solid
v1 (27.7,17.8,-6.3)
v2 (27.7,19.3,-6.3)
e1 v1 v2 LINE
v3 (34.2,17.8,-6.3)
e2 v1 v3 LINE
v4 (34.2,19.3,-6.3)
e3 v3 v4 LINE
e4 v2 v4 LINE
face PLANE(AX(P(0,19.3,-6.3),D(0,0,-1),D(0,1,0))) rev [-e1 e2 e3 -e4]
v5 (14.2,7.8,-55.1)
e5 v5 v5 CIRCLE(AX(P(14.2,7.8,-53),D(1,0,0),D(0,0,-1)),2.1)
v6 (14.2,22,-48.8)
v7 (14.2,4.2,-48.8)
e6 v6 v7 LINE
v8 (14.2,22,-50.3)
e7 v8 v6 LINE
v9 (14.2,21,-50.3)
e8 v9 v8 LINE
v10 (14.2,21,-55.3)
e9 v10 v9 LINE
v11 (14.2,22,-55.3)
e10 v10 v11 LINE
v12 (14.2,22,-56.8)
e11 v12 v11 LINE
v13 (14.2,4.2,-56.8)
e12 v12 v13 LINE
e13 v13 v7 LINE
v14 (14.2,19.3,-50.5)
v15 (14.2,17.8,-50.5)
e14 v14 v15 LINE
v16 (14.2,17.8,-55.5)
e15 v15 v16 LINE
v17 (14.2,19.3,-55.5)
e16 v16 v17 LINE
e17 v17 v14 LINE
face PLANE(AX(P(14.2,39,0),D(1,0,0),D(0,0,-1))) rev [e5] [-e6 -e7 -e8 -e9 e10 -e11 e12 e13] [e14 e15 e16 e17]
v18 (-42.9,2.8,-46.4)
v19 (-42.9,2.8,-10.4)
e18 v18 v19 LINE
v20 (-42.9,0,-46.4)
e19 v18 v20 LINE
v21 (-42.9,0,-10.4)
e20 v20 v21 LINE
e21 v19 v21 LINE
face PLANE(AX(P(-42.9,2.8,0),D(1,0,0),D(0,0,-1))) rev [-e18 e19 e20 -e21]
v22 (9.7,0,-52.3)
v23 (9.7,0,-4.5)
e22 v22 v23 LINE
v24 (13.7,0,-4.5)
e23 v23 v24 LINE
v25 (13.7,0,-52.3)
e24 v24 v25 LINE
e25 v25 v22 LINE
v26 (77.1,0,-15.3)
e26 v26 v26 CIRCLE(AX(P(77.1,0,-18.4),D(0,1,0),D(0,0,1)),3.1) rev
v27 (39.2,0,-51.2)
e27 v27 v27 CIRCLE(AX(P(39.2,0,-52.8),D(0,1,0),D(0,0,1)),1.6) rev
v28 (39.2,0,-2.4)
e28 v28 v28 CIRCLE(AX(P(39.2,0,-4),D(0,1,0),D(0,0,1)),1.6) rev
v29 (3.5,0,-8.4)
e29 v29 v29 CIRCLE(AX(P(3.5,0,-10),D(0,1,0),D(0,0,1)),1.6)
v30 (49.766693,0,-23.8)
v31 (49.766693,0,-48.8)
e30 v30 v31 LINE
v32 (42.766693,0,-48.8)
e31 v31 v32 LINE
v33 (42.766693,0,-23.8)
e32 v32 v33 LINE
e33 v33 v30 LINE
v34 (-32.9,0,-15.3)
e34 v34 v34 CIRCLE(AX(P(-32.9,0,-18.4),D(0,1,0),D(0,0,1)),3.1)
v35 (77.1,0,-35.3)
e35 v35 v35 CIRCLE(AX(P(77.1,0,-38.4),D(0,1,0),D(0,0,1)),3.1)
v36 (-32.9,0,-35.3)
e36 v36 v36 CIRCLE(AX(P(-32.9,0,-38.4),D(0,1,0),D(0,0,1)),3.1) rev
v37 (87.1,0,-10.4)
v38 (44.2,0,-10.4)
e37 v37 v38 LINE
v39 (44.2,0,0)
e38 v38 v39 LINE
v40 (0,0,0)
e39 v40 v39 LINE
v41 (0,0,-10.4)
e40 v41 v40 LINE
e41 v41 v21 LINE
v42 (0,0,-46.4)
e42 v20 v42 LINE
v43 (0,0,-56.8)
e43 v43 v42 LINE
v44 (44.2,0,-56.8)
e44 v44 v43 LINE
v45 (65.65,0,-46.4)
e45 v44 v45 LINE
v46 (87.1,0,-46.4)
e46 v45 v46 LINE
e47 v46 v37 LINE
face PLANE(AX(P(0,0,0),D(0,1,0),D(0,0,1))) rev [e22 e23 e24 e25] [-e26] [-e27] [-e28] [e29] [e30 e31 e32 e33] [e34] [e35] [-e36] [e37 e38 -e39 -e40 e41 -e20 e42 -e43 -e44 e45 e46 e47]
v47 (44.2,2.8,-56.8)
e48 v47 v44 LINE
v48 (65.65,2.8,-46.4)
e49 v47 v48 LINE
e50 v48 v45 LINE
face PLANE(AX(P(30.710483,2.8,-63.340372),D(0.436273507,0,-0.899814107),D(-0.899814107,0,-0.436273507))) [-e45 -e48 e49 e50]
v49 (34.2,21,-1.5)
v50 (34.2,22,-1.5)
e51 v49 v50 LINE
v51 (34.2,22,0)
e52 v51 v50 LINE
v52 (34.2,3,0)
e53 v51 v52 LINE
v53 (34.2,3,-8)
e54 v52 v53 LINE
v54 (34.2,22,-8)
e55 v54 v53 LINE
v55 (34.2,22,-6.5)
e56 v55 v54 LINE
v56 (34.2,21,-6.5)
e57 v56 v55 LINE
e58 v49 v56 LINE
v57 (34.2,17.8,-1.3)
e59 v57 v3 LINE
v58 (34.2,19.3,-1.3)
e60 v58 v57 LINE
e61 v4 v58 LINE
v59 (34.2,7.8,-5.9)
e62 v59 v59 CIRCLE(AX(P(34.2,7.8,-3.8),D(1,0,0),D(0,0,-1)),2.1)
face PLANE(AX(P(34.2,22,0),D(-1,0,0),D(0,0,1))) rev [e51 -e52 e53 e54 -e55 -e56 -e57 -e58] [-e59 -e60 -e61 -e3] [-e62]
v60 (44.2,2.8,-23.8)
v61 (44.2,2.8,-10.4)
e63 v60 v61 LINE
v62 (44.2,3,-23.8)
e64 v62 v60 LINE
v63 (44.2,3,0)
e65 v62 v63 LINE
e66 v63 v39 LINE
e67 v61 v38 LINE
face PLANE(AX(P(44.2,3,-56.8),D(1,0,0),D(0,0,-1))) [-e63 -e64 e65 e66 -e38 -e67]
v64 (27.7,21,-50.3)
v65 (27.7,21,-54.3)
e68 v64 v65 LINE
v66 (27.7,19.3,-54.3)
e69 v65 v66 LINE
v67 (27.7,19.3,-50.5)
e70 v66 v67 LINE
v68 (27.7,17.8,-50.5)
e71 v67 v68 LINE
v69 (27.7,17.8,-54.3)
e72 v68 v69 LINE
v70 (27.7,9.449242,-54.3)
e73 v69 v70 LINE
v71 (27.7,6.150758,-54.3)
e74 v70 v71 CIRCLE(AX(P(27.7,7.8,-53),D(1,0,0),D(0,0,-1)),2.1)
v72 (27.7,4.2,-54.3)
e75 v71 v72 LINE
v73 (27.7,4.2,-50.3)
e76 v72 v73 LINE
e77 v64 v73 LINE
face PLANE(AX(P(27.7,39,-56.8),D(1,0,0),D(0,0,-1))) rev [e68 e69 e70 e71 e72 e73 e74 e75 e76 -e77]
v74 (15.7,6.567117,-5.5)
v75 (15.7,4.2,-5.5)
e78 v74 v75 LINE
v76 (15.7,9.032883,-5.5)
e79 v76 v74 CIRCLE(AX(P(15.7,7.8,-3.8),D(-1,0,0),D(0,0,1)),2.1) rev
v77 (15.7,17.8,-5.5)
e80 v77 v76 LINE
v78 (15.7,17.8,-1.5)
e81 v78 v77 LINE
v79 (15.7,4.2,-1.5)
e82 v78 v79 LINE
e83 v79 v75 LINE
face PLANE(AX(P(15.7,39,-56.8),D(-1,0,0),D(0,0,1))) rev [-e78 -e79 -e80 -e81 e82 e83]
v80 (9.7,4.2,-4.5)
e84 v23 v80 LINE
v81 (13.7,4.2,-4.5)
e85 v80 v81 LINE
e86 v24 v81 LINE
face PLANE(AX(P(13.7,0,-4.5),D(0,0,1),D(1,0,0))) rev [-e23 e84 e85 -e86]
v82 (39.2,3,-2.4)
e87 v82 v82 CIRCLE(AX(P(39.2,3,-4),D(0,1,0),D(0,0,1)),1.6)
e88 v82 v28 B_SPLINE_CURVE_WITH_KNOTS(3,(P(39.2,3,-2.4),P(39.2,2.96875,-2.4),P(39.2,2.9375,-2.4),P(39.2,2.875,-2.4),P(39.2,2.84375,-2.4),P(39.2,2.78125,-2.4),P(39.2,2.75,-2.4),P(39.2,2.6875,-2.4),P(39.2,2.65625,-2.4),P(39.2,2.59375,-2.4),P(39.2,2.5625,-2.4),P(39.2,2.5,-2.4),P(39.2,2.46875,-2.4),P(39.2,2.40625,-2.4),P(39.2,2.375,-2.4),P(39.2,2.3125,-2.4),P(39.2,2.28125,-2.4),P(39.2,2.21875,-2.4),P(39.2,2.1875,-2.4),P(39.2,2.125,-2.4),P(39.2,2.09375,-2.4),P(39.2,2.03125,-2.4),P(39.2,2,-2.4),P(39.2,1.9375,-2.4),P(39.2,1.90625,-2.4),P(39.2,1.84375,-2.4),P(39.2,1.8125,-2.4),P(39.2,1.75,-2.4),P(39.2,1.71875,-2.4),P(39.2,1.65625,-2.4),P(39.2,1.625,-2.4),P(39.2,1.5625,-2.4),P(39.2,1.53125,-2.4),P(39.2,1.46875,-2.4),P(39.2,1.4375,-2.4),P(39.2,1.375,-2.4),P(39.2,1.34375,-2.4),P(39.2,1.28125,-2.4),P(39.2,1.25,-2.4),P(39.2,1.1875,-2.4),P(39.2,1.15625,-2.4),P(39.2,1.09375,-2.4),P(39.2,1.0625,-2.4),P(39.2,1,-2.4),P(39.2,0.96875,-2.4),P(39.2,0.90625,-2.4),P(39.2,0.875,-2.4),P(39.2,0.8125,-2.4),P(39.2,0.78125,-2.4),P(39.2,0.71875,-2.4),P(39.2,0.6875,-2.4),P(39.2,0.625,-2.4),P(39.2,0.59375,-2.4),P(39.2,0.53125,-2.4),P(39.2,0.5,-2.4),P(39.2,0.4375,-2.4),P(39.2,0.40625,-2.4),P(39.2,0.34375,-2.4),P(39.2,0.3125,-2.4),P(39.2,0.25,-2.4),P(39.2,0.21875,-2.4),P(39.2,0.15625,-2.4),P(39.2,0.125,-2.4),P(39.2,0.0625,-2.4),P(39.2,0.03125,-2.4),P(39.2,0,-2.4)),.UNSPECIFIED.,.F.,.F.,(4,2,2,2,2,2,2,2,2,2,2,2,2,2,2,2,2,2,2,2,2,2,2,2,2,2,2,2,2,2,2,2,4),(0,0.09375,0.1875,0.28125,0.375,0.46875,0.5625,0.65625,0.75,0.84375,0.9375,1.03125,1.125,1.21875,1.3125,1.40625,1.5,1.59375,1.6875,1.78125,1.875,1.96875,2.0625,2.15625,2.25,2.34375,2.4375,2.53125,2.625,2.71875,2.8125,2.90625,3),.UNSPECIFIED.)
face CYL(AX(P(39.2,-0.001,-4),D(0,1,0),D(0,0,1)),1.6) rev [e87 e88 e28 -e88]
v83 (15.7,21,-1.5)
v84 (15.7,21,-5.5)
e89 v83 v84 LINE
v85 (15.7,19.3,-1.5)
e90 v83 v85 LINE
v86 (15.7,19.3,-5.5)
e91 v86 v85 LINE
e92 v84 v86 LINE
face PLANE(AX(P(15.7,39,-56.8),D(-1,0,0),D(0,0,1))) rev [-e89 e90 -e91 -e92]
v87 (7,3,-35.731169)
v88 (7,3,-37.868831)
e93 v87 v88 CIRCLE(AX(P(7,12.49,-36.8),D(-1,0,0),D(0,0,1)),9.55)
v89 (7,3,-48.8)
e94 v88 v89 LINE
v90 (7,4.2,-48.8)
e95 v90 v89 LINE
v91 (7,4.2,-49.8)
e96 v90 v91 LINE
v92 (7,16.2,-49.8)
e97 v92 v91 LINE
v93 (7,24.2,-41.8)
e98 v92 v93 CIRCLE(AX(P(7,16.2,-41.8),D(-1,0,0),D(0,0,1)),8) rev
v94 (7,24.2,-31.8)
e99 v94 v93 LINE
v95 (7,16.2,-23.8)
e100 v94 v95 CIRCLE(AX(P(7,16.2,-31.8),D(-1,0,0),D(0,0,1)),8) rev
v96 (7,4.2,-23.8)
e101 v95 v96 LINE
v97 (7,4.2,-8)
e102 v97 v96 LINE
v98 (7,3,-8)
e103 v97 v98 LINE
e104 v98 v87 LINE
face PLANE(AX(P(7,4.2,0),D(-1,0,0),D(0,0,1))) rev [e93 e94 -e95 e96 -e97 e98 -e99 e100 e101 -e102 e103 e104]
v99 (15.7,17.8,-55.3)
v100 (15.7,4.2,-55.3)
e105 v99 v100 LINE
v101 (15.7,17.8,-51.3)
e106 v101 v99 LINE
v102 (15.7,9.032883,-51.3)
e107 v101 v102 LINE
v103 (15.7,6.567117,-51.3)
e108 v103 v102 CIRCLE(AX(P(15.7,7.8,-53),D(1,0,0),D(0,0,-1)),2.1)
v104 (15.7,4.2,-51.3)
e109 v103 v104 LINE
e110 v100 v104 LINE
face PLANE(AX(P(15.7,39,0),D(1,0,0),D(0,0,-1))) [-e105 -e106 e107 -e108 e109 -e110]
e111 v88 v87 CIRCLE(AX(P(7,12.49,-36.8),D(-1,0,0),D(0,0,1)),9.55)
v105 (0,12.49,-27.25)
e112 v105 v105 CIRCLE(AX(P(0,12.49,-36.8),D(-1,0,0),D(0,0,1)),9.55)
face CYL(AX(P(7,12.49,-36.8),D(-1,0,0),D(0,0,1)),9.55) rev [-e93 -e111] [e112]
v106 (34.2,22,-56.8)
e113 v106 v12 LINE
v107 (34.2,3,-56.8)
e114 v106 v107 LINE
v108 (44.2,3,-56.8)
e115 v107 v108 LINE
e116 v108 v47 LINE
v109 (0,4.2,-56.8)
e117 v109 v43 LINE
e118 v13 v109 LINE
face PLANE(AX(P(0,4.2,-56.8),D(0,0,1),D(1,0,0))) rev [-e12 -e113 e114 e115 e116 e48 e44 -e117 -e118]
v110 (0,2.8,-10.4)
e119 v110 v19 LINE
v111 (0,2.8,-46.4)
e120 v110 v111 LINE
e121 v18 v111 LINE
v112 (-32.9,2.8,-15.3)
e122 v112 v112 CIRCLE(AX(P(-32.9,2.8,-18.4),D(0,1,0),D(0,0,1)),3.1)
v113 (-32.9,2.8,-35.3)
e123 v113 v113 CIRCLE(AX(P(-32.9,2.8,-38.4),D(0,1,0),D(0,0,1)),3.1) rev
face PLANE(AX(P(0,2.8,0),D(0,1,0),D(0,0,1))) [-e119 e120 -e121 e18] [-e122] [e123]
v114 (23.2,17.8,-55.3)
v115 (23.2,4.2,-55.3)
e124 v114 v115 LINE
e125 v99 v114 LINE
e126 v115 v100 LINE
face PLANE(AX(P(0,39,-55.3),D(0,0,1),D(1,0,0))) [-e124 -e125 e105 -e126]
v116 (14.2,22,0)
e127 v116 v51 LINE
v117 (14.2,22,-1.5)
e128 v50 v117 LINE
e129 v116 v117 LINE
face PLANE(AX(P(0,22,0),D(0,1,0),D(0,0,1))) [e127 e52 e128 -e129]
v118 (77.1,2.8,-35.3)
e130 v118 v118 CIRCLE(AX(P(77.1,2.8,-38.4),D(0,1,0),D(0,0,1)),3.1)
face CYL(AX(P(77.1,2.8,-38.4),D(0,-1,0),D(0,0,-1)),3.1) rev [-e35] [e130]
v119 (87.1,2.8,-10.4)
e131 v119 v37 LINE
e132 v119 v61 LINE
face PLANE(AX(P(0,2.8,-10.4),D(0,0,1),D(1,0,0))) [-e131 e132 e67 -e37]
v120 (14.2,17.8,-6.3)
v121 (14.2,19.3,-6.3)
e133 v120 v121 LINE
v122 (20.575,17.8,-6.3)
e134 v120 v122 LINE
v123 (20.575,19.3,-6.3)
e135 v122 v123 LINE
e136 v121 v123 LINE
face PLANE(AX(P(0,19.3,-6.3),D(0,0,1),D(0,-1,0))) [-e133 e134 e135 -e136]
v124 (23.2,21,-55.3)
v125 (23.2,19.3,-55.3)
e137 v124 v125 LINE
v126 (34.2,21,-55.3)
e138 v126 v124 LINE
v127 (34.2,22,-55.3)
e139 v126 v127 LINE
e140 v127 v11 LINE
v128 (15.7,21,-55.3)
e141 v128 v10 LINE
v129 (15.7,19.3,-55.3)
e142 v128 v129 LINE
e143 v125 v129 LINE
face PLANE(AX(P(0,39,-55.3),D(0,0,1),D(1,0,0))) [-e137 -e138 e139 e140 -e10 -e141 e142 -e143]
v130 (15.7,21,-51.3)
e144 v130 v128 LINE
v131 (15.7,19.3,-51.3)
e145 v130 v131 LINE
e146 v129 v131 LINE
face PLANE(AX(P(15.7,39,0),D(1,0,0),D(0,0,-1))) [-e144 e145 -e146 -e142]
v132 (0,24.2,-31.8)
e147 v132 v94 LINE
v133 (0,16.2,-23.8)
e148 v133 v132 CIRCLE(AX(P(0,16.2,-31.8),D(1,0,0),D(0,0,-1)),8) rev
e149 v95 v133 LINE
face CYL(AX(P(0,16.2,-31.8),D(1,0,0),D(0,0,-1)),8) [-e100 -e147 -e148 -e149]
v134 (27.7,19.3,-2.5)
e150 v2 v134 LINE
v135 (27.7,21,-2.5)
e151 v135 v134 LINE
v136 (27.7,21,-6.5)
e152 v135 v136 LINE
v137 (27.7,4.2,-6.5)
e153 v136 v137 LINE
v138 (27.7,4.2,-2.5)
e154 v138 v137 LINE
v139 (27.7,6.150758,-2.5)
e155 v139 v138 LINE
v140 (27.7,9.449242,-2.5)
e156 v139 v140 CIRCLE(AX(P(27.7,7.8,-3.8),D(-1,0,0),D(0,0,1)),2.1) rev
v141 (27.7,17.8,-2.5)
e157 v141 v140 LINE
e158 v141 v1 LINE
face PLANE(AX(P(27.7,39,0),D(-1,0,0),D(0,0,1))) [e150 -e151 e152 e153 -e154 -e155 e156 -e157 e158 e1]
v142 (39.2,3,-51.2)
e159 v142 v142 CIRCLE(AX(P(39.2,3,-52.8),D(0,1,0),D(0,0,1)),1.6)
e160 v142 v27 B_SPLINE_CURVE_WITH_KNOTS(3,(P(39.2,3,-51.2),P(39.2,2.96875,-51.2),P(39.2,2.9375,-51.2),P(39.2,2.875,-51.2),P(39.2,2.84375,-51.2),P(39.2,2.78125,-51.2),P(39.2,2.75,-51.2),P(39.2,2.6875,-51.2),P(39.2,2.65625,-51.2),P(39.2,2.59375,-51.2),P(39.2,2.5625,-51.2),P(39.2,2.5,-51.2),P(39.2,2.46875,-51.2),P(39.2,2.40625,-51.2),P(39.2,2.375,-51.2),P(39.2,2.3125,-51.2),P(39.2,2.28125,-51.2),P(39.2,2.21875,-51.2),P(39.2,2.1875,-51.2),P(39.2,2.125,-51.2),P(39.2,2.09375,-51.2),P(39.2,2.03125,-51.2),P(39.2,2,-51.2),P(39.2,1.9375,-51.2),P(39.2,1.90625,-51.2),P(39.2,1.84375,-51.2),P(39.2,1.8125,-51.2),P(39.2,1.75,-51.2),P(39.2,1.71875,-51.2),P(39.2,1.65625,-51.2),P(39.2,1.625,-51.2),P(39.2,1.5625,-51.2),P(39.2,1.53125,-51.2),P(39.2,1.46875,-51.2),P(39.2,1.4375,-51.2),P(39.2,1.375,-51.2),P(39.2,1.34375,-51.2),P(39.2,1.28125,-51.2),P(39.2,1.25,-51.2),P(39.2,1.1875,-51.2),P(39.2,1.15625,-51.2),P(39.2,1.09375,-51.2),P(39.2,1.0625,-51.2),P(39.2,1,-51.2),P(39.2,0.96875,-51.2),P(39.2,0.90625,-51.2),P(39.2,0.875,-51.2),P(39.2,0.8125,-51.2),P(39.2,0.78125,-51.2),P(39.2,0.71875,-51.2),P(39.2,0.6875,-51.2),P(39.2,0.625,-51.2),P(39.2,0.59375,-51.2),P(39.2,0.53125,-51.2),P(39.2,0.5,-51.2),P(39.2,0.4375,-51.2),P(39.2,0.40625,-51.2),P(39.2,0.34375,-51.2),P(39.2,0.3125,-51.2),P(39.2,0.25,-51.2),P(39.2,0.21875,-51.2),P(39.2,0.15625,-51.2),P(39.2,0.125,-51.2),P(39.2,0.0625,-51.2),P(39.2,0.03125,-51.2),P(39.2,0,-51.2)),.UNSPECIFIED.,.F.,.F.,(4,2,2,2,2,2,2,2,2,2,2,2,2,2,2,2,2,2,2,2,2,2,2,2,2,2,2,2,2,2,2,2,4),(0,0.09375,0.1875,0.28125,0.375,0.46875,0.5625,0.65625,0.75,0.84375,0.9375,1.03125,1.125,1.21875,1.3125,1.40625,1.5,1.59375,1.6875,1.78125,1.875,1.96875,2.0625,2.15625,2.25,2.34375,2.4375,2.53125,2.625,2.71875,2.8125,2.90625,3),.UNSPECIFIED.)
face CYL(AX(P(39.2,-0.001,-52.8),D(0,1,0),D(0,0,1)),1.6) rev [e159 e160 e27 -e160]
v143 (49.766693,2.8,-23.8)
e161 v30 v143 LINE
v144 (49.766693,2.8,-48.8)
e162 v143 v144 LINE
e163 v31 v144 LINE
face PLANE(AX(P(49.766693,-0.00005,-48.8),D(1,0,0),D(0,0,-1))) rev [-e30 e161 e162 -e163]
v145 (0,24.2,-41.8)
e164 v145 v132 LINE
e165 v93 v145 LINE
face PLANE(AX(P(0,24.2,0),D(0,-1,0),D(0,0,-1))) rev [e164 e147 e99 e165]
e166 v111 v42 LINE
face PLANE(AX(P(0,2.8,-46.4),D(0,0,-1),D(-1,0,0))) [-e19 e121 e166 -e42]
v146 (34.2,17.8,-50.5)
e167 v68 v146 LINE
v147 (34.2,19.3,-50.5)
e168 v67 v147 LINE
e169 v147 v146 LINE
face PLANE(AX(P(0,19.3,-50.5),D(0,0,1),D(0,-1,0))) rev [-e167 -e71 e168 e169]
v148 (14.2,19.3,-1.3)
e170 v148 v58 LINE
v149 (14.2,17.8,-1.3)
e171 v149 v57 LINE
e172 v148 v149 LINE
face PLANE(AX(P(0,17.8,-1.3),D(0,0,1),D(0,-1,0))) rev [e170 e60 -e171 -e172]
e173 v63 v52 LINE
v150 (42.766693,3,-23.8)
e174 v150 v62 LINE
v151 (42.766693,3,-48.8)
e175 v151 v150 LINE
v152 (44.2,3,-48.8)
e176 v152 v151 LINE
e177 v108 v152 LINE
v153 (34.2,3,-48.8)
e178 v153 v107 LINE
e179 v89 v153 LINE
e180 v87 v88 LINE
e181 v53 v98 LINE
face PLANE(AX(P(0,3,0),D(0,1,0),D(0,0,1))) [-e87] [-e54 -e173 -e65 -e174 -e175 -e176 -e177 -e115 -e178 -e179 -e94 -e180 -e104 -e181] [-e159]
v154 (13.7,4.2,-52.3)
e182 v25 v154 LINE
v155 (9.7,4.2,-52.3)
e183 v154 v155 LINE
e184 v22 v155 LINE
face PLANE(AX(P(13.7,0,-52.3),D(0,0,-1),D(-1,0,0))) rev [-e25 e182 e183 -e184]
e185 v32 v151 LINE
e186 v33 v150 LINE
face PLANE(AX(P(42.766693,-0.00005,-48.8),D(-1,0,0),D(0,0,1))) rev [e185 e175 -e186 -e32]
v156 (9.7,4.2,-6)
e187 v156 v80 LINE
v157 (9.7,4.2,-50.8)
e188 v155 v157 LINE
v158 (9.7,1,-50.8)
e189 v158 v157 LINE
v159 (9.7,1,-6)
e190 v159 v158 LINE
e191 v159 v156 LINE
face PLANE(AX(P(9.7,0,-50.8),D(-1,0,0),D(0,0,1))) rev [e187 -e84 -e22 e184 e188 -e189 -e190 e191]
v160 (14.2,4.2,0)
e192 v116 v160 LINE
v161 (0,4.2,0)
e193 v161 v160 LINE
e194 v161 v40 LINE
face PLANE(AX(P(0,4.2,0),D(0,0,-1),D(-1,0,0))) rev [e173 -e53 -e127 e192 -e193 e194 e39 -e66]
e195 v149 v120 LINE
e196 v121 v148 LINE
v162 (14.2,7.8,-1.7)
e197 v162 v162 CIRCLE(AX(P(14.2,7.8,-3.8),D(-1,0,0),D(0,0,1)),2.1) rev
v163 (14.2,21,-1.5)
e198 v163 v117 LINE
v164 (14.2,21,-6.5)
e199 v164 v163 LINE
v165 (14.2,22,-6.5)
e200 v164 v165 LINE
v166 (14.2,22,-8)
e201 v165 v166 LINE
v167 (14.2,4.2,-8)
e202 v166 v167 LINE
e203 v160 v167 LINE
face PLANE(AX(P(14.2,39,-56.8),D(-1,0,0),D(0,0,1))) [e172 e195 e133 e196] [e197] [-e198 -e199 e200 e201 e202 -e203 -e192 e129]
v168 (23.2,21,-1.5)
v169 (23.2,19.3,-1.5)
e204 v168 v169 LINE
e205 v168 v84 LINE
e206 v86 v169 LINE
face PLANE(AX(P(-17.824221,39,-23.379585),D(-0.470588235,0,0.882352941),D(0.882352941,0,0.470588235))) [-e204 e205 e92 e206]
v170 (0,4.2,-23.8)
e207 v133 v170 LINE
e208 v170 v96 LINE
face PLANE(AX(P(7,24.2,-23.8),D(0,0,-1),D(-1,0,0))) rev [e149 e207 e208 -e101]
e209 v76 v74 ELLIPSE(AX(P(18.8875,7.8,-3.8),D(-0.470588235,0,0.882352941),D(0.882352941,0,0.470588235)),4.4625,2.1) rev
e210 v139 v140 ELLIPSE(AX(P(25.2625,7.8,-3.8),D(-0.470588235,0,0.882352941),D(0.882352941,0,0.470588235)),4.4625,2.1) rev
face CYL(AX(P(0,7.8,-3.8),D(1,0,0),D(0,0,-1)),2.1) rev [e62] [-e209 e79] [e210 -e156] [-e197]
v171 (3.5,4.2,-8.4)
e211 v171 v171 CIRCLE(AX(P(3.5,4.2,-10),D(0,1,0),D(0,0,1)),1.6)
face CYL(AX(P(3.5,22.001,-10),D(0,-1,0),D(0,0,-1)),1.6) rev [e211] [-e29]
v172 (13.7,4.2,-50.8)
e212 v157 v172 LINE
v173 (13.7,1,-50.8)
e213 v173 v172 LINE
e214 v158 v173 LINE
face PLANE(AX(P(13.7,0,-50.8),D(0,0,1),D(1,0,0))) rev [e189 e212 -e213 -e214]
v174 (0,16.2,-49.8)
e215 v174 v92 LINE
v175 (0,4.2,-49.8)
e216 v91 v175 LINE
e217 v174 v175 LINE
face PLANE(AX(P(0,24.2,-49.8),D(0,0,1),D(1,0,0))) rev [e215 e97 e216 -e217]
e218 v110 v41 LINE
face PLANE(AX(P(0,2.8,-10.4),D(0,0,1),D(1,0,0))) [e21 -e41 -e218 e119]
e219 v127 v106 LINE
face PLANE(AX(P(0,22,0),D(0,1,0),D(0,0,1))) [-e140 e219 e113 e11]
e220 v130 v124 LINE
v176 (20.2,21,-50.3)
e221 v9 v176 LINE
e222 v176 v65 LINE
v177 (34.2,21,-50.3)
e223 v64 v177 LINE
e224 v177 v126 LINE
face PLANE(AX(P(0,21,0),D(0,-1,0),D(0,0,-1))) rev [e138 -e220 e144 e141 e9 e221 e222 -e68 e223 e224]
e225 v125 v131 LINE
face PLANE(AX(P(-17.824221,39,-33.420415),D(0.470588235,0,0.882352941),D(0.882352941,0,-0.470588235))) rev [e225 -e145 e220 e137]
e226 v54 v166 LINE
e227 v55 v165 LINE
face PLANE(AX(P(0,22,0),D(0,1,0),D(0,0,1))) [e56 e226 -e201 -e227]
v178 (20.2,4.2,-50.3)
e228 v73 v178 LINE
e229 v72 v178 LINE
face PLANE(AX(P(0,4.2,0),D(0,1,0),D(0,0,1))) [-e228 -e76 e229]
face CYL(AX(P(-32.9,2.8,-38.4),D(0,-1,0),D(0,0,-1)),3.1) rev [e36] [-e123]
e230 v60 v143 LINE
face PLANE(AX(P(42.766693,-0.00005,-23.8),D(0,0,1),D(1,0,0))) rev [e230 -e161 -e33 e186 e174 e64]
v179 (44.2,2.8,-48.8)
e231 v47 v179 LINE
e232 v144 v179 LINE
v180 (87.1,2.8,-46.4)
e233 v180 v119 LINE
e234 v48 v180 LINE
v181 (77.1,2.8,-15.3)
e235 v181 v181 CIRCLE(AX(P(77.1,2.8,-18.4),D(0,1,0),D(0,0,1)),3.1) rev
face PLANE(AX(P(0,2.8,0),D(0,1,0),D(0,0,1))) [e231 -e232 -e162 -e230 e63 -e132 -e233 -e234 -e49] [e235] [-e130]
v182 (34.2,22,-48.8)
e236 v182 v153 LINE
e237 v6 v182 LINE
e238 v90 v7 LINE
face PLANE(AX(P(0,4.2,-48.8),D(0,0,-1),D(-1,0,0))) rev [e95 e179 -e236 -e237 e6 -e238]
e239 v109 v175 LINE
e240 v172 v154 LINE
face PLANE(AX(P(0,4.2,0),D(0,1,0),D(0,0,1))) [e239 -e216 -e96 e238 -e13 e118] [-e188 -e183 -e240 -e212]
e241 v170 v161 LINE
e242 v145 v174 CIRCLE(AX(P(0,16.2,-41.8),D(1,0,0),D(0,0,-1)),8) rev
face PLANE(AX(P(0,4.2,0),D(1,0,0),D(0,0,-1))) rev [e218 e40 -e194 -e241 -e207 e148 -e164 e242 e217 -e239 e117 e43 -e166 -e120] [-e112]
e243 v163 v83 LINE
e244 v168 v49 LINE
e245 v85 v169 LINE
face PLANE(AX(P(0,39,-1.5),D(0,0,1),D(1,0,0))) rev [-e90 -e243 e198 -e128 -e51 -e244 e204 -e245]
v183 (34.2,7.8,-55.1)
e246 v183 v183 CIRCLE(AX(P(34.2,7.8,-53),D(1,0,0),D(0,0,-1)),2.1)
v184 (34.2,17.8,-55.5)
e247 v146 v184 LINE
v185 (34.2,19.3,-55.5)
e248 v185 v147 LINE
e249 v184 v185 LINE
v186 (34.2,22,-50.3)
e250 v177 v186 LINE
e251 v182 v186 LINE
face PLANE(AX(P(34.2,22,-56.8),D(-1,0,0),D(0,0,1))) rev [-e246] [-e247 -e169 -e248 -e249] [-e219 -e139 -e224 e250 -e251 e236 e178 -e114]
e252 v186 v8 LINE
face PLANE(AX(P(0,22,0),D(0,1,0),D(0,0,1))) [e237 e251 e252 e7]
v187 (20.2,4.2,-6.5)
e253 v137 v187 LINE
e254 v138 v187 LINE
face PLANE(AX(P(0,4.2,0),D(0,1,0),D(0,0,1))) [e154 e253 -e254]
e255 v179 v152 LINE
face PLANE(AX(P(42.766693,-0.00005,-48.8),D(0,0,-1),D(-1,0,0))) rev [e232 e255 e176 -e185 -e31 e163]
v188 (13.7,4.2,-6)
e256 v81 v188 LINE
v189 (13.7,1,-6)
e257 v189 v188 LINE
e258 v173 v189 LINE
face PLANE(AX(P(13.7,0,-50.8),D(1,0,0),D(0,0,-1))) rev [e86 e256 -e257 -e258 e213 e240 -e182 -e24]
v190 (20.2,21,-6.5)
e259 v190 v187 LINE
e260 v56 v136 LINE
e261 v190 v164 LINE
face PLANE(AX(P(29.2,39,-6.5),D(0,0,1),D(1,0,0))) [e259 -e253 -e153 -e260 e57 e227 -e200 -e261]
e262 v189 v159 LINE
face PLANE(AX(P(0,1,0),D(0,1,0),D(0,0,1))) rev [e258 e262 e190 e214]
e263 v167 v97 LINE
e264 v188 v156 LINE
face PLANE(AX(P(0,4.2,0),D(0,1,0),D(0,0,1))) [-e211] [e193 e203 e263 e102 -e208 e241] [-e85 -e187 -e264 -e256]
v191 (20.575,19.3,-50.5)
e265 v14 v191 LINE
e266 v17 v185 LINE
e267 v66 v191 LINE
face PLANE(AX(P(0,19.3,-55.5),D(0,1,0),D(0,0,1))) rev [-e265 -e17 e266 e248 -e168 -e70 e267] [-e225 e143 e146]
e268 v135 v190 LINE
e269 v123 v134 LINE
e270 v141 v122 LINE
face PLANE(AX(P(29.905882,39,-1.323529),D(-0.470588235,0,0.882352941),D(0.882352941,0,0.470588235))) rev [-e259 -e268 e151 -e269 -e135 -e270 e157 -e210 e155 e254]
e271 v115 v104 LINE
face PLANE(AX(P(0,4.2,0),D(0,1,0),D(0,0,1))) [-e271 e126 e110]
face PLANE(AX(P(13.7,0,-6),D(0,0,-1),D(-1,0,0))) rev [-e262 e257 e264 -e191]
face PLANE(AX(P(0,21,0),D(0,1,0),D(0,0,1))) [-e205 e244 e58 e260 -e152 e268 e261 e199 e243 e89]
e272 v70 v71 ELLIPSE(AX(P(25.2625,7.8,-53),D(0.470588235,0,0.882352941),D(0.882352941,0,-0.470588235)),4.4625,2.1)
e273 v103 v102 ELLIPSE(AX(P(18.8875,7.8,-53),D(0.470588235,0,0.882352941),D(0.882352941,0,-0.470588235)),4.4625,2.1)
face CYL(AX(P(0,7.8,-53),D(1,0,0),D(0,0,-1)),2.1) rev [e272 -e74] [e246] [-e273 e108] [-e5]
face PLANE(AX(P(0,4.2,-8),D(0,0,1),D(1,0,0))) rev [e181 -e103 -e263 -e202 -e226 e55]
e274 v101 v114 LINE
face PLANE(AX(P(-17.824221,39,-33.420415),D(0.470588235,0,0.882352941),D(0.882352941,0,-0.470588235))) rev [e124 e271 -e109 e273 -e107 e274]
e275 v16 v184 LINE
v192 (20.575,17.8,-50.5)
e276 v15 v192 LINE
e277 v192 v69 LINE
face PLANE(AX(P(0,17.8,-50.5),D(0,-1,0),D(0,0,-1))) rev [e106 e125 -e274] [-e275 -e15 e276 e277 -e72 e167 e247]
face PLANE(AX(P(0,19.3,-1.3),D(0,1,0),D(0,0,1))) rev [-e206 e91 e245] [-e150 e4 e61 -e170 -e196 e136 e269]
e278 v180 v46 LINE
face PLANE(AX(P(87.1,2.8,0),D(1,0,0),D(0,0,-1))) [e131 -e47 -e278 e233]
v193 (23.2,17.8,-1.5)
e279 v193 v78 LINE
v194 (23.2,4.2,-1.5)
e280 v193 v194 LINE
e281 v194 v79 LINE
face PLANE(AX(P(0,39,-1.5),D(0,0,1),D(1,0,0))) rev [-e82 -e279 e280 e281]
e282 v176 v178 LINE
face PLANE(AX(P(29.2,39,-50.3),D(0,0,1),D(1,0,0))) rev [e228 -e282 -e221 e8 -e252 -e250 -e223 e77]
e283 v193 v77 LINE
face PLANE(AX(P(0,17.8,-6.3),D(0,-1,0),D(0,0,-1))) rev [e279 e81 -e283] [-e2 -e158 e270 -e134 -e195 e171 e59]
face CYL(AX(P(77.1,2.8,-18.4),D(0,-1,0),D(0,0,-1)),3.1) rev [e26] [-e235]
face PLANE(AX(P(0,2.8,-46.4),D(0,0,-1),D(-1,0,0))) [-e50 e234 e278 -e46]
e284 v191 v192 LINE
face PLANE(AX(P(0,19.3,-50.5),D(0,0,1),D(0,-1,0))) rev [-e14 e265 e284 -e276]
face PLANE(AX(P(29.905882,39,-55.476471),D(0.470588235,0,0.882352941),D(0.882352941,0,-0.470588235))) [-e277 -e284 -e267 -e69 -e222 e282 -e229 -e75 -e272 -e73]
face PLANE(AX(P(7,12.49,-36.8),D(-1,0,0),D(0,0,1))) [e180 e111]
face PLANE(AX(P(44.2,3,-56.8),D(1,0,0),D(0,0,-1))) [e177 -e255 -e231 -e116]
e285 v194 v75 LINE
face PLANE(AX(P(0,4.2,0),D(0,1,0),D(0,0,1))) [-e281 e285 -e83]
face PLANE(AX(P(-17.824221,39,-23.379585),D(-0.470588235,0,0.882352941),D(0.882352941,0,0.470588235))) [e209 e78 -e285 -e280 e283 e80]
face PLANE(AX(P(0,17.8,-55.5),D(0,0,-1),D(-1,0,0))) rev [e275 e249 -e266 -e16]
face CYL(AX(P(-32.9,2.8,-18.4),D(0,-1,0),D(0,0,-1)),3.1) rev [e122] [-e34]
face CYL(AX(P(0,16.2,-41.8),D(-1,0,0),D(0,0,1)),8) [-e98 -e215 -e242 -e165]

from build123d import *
from build123d.topology import SkipClean

# Parameters (mm, degrees)
BOSS_EXTRU_1_DEPTH           = 4.2
ESQUISSE2_W                  = 5
ESQUISSE2_H                  = 8
BOSS_EXTRU_2_DEPTH           = 22
ENL_V_MAT_EXTRU_2_REACH      = 71.856
ESQUISSE4_R                  = 1.6
EXTRU_MINCE1_OUTLINE_W       = 15
EXTRU_MINCE1_OUTLINE_H       = 8
EXTRU_MINCE1_DEPTH           = 17.8
BOSS_EXTRU_3_DEPTH           = 3
ESQUISSE3_R                  = 2.1
ESQUISSE3_W                  = 5
ESQUISSE3_H                  = 1.5
ENL_V_MAT_EXTRU_1_DEPTH      = 70.856137884
ENL_V_MAT_EXTRU_3_REACH      = 76.437
ESQUISSE7_R                  = 1.6
ESQUISSE8_W                  = 20
ESQUISSE8_H                  = 5
ENL_V_MAT_EXTRU_5_DEPTH      = 1
ESQUISSE9_W                  = 7
ESQUISSE9_H                  = 26
BOSS_EXTRU_4_DEPTH           = 20
ESQUISSE10_R                 = 9.55
ENL_V_MAT_EXTRU_6_DEPTH      = 7
CONG_1_R                     = 8
ESQUISSE11_W                 = 4
ESQUISSE11_H                 = 1.5
ENL_V_MAT_EXTRU_7_DEPTH      = 75.698594364
ESQUISSE12_W                 = 4
ESQUISSE12_H                 = 44.8
ENL_V_MAT_EXTRU_8_DEPTH      = 1
ESQUISSE13_R                 = 3.1
ESQUISSE13_W                 = 42.9
ESQUISSE13_H                 = 36
BOSS_EXTRU_5_DEPTH           = 2.8
ENL_V_MAT_EXTRU_9_DEPTH      = 107.163129193
ENL_V_MAT_EXTRU_9_DEPTH_BACK = 107.163129193
ESQUISSE14_W                 = 7
ESQUISSE14_H                 = 25


# Read off the part's stored shape, not the designer's step: Extru.-Mince1
with BuildPart() as part:
    # Esquisse1 → Boss.-Extru.1 (new body)
    with BuildSketch(Plane(origin=(0, 0, 0), x_dir=(1, 0, 0), z_dir=(0, 1, 0))):
        Polygon((0, 0), (29.2, 0), (29.2, 8), (7, 8), (7, 48.8), (29.2, 48.8), (29.2, 56.8), (0, 56.8), align=None)
    extrude(amount=BOSS_EXTRU_1_DEPTH)

    # Esquisse2 → Boss.-Extru.2 (add)
    with BuildSketch(Plane(origin=(0, 0, 0), x_dir=(1, 0, 0), z_dir=(0, 1, 0))):
        with Locations((31.7, 52.8)):
            Rectangle(ESQUISSE2_W, ESQUISSE2_H)
        with Locations((31.7, 4)):
            Rectangle(ESQUISSE2_W, ESQUISSE2_H)
    extrude(amount=BOSS_EXTRU_2_DEPTH)

    # Esquisse4 → Enlèv. mat.-Extru.2 (cut, up to next)
    with BuildSketch(Plane(origin=(0, 0, 0), x_dir=(1, 0, 0), z_dir=(0, 1, 0)), mode=Mode.PRIVATE) as enl_v_mat_extru_2_sk1:
        with Locations(Location((3.5, 10, 0), (0, 0, 270))):
            Circle(ESQUISSE4_R)
    enl_v_mat_extru_2_tool1 = extrude(enl_v_mat_extru_2_sk1.sketch, amount=ENL_V_MAT_EXTRU_2_REACH, mode=Mode.PRIVATE) & part.part
    add(enl_v_mat_extru_2_tool1.solids().sort_by_distance((3.5, 0, -10))[0], mode=Mode.SUBTRACT)

    # Extru.-Mince1 outline → Extru.-Mince1 (add)
    with BuildSketch(Plane(origin=(0, 4.2, 0), x_dir=(1, 0, 0), z_dir=(0, 1, 0))):
        with Locations((21.7, 52.8)):
            Rectangle(EXTRU_MINCE1_OUTLINE_W, EXTRU_MINCE1_OUTLINE_H)
        Polygon((27.7, 50.3), (20.2, 50.3), (27.7, 54.3), align=None, mode=Mode.SUBTRACT)
        Polygon((15.7, 51.3), (15.7, 55.3), (23.2, 55.3), align=None, mode=Mode.SUBTRACT)
    extru_mince1 = extrude(amount=EXTRU_MINCE1_DEPTH)

    # Esquisse6 → Boss.-Extru.3 (add)
    with BuildSketch(Plane.XZ):
        Polygon((34.2, -8), (7, -8), (7, -48.8), (34.2, -48.8), (34.2, -56.8), (44.2, -56.8), (44.2, 0), (34.2, 0), align=None)
    extrude(amount=-BOSS_EXTRU_3_DEPTH)

    # Esquisse3 → Enlèv. mat.-Extru.1 (cut, through all)
    with BuildSketch(Plane(origin=(34.2, 0, 0), x_dir=(0, 0, -1), z_dir=(1, 0, 0))):
        with Locations((3.8, 7.8)):
            Circle(ESQUISSE3_R)
        with Locations((53, 7.8)):
            Circle(ESQUISSE3_R)
        with Locations((3.8, 18.55)):
            Rectangle(ESQUISSE3_W, ESQUISSE3_H)
        with Locations((53, 18.55)):
            Rectangle(ESQUISSE3_W, ESQUISSE3_H)
    enl_v_mat_extru_1 = extrude(amount=-ENL_V_MAT_EXTRU_1_DEPTH, mode=Mode.SUBTRACT)

    # Symétrie1: Extru.-Mince1, Enlèv. mat.-Extru.1 across plane
    with SkipClean():  # the faces are left unmerged after this step: merging them gives an invalid solid
        add(extru_mince1.mirror(Plane(origin=(0, 0, -28.4), x_dir=(1, 0, 0), z_dir=(0, 0, -1))))
        add(enl_v_mat_extru_1.mirror(Plane(origin=(0, 0, -28.4), x_dir=(1, 0, 0), z_dir=(0, 0, -1))), mode=Mode.SUBTRACT)

    # Esquisse7 → Enlèv. mat.-Extru.3 (cut, up to next)
    with BuildSketch(Plane(origin=(0, 3, 0), x_dir=(1, 0, 0), z_dir=(0, 1, 0)), mode=Mode.PRIVATE) as enl_v_mat_extru_3_sk1:
        with Locations(Location((39.2, 52.8, 0), (0, 0, 270))):
            Circle(ESQUISSE7_R)
    enl_v_mat_extru_3_tool1 = extrude(enl_v_mat_extru_3_sk1.sketch, amount=-ENL_V_MAT_EXTRU_3_REACH, mode=Mode.PRIVATE) & part.part
    # Esquisse7 → Enlèv. mat.-Extru.3 (cut, up to next)
    with BuildSketch(Plane(origin=(0, 3, 0), x_dir=(1, 0, 0), z_dir=(0, 1, 0)), mode=Mode.PRIVATE) as enl_v_mat_extru_3_sk2:
        with Locations(Location((39.2, 4, 0), (0, 0, 270))):
            Circle(ESQUISSE7_R)
    enl_v_mat_extru_3_tool2 = extrude(enl_v_mat_extru_3_sk2.sketch, amount=-ENL_V_MAT_EXTRU_3_REACH, mode=Mode.PRIVATE) & part.part
    add(enl_v_mat_extru_3_tool1.solids().sort_by_distance((39.2, 3, -52.8))[0], mode=Mode.SUBTRACT)
    add(enl_v_mat_extru_3_tool2.solids().sort_by_distance((39.2, 3, -4))[0], mode=Mode.SUBTRACT)

    # Esquisse8 → Enlèv. mat.-Extru.5 (cut)
    with SkipClean():  # the faces are left unmerged after this step: merging them gives an invalid solid
        with BuildSketch(Plane(origin=(0, 22, 0), x_dir=(1, 0, 0), z_dir=(0, 1, 0))):
            with Locations((24.2, 52.8)):
                Rectangle(ESQUISSE8_W, ESQUISSE8_H)
            with Locations((24.2, 4)):
                Rectangle(ESQUISSE8_W, ESQUISSE8_H)
        extrude(amount=-ENL_V_MAT_EXTRU_5_DEPTH, mode=Mode.SUBTRACT)

    # Esquisse9 → Boss.-Extru.4 (add)
    with SkipClean():  # the faces are left unmerged after this step: merging them gives an invalid solid
        with BuildSketch(Plane(origin=(0, 4.2, 0), x_dir=(1, 0, 0), z_dir=(0, 1, 0))):
            with Locations((3.5, 36.8)):
                Rectangle(ESQUISSE9_W, ESQUISSE9_H)
        extrude(amount=BOSS_EXTRU_4_DEPTH)

    # Esquisse10 → Enlèv. mat.-Extru.6 (cut)
    with SkipClean():  # the faces are left unmerged after this step: merging them gives an invalid solid
        with BuildSketch(Plane.ZY):
            with Locations((-36.8, 12.49)):
                Circle(ESQUISSE10_R)
        extrude(amount=-ENL_V_MAT_EXTRU_6_DEPTH, mode=Mode.SUBTRACT)

    # Congé1
    cong_1_edges = [part.edges().sort_by_distance(p)[0] for p in [
        (3.5, 24.2, -23.8),
        (3.5, 24.2, -49.8),
    ]]
    fillet(cong_1_edges, radius=CONG_1_R)

    # Esquisse11 → Enlèv. mat.-Extru.7 (cut, through all)
    with SkipClean():  # the faces are left unmerged after this step: merging them gives an invalid solid
        with BuildSketch(Plane(origin=(0, 4.2, 0), x_dir=(1, 0, 0), z_dir=(0, 1, 0))):
            with Locations((11.7, 51.55)):
                Rectangle(ESQUISSE11_W, ESQUISSE11_H)
            with Locations((11.7, 5.25)):
                Rectangle(ESQUISSE11_W, ESQUISSE11_H)
        extrude(amount=-ENL_V_MAT_EXTRU_7_DEPTH, mode=Mode.SUBTRACT)

    # Esquisse12 → Enlèv. mat.-Extru.8 (cut)
    with SkipClean():  # the faces are left unmerged after this step: merging them gives an invalid solid
        with BuildSketch(Plane.XZ):
            with Locations((11.7, -28.4)):
                Rectangle(ESQUISSE12_W, ESQUISSE12_H)
        extrude(amount=-ENL_V_MAT_EXTRU_8_DEPTH, mode=Mode.SUBTRACT)

    # Esquisse13 → Boss.-Extru.5 (add)
    # profile 1 of 2: a face of its own
    with SkipClean():  # the faces are left unmerged after this step: merging them gives an invalid solid
        with BuildSketch(Plane(origin=(0, 0, 0), x_dir=(1, 0, 0), z_dir=(0, 1, 0))):
            Polygon((65.65, 46.4), (87.1, 46.4), (87.1, 10.4), (44.2, 10.4), (44.2, 46.4), (44.2, 56.8), align=None)
            with Locations(Location((77.1, 38.4, 0), (0, 0, 270))):
                Circle(ESQUISSE13_R, mode=Mode.SUBTRACT)
            with Locations(Location((77.1, 18.4, 0), (0, 0, 270))):
                Circle(ESQUISSE13_R, mode=Mode.SUBTRACT)
        # profile 2 of 2: a face of its own
        with BuildSketch(Plane(origin=(0, 0, 0), x_dir=(1, 0, 0), z_dir=(0, 1, 0))):
            with Locations((-21.45, 28.4)):
                Rectangle(ESQUISSE13_W, ESQUISSE13_H)
            with Locations(Location((-32.9, 18.4, 0), (0, 0, 270))):
                Circle(ESQUISSE13_R, mode=Mode.SUBTRACT)
            with Locations(Location((-32.9, 38.4, 0), (0, 0, 270))):
                Circle(ESQUISSE13_R, mode=Mode.SUBTRACT)
        extrude(amount=BOSS_EXTRU_5_DEPTH)

    # Esquisse14 → Enlèv. mat.-Extru.9 (cut, two sides: drawn at the far end of the back side and taken through both)
    with SkipClean():  # the faces are left unmerged after this step: merging them gives an invalid solid
        with BuildSketch(Plane(origin=(0, 2.8, 0), x_dir=(1, 0, 0), z_dir=(0, 1, 0)).offset(-ENL_V_MAT_EXTRU_9_DEPTH_BACK)):
            with Locations((46.266692991, 36.3)):
                Rectangle(ESQUISSE14_W, ESQUISSE14_H)
        extrude(amount=ENL_V_MAT_EXTRU_9_DEPTH + ENL_V_MAT_EXTRU_9_DEPTH_BACK, mode=Mode.SUBTRACT)


solid = part.part
